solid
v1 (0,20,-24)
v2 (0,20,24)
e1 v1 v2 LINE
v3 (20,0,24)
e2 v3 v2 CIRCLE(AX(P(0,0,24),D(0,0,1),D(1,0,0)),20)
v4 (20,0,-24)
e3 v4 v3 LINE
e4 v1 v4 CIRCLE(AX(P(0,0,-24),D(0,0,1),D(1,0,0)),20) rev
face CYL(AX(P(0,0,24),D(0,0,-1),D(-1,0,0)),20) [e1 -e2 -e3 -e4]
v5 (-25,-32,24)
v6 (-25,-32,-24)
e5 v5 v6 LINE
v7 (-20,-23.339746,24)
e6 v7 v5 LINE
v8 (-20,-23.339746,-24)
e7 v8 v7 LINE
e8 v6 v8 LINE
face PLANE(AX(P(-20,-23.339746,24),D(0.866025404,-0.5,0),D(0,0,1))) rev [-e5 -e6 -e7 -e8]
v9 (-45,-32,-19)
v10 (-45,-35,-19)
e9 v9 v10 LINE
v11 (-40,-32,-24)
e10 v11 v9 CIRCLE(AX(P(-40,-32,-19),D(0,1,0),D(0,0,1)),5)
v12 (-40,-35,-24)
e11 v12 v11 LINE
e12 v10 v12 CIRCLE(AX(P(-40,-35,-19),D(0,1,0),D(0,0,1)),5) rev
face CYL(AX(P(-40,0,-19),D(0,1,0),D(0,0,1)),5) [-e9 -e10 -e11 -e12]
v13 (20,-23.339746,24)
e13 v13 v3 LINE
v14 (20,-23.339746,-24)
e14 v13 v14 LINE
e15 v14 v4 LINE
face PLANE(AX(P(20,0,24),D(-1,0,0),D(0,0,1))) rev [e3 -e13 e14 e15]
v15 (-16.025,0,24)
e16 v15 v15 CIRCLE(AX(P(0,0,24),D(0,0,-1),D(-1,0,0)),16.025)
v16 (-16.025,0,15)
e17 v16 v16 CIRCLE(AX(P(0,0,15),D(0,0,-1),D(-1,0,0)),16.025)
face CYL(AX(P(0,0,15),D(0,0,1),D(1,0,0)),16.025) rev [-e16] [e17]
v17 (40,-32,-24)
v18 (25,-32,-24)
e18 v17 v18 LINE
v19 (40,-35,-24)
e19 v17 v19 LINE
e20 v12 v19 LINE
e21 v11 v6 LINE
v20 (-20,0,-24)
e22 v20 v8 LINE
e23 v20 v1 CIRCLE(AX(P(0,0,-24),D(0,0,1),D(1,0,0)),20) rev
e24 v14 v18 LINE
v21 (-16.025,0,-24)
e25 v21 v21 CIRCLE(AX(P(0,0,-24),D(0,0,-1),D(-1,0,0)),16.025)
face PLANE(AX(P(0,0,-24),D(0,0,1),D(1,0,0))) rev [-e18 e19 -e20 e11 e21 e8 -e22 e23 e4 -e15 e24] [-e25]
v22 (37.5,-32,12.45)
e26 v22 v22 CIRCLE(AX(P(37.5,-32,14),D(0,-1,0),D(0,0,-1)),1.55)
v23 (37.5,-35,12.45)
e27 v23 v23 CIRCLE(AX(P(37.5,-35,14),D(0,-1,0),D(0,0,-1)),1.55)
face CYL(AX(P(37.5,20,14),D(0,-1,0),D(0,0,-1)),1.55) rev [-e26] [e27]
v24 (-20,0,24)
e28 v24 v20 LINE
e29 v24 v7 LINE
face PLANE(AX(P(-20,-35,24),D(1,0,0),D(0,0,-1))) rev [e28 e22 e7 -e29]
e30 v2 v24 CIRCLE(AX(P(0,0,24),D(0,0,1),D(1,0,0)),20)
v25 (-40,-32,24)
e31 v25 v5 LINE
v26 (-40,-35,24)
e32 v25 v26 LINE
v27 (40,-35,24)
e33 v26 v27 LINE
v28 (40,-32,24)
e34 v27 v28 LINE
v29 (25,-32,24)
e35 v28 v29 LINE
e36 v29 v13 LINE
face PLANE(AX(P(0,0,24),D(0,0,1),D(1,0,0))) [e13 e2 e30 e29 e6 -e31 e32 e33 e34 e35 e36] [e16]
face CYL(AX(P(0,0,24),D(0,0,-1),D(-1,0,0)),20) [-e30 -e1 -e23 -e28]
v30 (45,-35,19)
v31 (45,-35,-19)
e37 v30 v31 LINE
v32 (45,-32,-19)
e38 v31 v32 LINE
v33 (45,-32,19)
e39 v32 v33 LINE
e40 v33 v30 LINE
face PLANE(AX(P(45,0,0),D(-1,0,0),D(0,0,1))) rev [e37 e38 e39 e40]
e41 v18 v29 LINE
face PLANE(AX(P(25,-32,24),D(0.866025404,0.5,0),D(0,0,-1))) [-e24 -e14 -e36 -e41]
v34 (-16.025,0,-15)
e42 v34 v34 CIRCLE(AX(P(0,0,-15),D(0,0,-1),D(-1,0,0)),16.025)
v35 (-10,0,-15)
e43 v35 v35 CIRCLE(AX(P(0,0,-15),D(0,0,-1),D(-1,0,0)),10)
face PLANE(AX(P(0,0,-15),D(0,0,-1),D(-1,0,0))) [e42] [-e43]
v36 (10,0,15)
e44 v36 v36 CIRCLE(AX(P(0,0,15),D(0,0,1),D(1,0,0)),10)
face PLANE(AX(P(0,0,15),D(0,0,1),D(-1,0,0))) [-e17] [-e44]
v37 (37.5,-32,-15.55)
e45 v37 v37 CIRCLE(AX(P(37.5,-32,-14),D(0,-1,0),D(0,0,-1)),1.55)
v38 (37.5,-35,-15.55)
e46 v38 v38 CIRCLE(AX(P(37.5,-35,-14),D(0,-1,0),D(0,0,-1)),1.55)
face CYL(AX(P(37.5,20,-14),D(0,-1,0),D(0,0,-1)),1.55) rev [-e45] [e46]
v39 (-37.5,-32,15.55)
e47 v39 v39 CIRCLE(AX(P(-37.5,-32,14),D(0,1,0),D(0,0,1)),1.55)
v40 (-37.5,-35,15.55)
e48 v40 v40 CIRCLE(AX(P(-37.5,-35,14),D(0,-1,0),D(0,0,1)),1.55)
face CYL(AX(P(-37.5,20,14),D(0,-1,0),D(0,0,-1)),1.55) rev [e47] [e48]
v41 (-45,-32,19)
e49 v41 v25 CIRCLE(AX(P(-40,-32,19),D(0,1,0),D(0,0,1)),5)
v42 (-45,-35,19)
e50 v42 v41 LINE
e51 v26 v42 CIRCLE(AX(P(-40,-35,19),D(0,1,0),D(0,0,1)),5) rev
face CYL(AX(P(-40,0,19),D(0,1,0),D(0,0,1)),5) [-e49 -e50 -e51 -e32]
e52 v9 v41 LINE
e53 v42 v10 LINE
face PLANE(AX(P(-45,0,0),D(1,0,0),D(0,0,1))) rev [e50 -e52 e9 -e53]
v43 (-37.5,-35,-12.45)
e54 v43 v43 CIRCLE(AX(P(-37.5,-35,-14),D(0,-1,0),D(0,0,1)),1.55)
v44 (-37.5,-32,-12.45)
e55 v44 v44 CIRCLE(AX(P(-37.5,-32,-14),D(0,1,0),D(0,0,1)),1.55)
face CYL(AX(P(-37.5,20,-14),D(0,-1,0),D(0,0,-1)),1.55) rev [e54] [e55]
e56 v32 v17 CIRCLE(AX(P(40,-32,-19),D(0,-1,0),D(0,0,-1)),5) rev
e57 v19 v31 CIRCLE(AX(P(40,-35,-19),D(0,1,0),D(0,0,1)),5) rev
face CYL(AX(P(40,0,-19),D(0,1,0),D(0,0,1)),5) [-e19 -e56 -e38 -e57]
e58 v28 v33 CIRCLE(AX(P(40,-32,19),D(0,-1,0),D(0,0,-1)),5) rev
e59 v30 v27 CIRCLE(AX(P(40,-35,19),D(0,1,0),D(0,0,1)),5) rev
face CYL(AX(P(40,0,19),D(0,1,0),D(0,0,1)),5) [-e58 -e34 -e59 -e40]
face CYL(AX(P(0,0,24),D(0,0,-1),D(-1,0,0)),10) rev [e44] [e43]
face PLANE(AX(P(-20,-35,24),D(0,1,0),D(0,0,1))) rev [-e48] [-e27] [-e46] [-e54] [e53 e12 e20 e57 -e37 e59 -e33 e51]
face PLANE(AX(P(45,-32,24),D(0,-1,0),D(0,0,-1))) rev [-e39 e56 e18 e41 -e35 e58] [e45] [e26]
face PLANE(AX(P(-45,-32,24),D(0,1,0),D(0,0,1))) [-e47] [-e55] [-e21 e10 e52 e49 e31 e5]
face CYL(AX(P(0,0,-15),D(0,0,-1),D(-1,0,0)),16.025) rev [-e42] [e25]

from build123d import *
from OCP.BRepFilletAPI import BRepFilletAPI_MakeChamfer

# Parameters (mm, degrees)
SKETCH_1_R          = 10
EXTRUDE_1_DEPTH     = 24
SKETCH_4_R          = 16.025
CUT_EXTRUDE_3_DEPTH = 9
SKETCH_5_W          = 48
SKETCH_5_H          = 3
EXTRUDE_2_DEPTH     = 25
CHAMFER_1_SIZE      = 5
CHAMFER_1_SIZE2     = 8.660254038
SKETCH_7_R          = 1.55
CUT_EXTRUDE_4_DEPTH = 76.00666637
FILLET_1_R          = 20
FILLET_2_R          = 5


with BuildPart() as part:
    # 草图1 → 凸台-拉伸1 (new, symmetric)
    with BuildSketch(Plane.XY):
        Polygon((-20, -35), (-20, 0), (-20, 20), (20, 20), (20, 0), (20, -35), align=None)
        Circle(SKETCH_1_R, mode=Mode.SUBTRACT)
    extrude(amount=EXTRUDE_1_DEPTH, both=True)

    # 草图4 → 切除-拉伸3 (cut)
    with BuildSketch(Plane(origin=(0, 0, -24), x_dir=(-1, 0, 0), z_dir=(0, 0, -1))):
        Circle(SKETCH_4_R)
    cut_extrude_3 = extrude(amount=-CUT_EXTRUDE_3_DEPTH, mode=Mode.SUBTRACT)

    # 镜向1: 切除-拉伸3 across plane
    add(cut_extrude_3.mirror(Plane.XY), mode=Mode.SUBTRACT)

    # 草图5 → 凸台-拉伸2 (add)
    with BuildSketch(Plane(origin=(20, 0, 0), x_dir=(0, 0, -1), z_dir=(1, 0, 0))):
        with Locations((0, -33.5)):
            Rectangle(SKETCH_5_W, SKETCH_5_H)
    extrude_2 = extrude(amount=EXTRUDE_2_DEPTH)

    # 镜向2: 凸台-拉伸2 across plane
    add(extrude_2.mirror(Plane.ZY))

    # 倒角1: one chamfer whose edges measure the first distance from different faces: ONE call of the kernel's chamfer builder (chamfer() names one face for all edges)
    chamfer_1_edges_1 = [part.edges().sort_by_distance(p)[0] for p in [
        (20, -32, 0),
    ]]
    chamfer_1_side_1 = [part.faces().sort_by_distance(p)[0] for p in [
        (32.5, -32, 0),
    ]]
    chamfer_1_edges_2 = [part.edges().sort_by_distance(p)[0] for p in [
        (-20, -32, 0),
    ]]
    chamfer_1_side_2 = [part.faces().sort_by_distance(p)[0] for p in [
        (-32.5, -32, 0),
    ]]
    chamfer_1 = BRepFilletAPI_MakeChamfer(part.part.solid().wrapped)
    for e in chamfer_1_edges_1:
        chamfer_1.Add(CHAMFER_1_SIZE, CHAMFER_1_SIZE2, e.wrapped, chamfer_1_side_1[0].wrapped)  # the first distance lies on this face
    for e in chamfer_1_edges_2:
        chamfer_1.Add(CHAMFER_1_SIZE, CHAMFER_1_SIZE2, e.wrapped, chamfer_1_side_2[0].wrapped)  # the first distance lies on this face
    add(Compound.cast(chamfer_1.Shape()), mode=Mode.REPLACE)

    # 草图7 → 切除-拉伸4 (cut, through all)
    with BuildSketch(Plane.XZ.offset(35)):
        with Locations(Location((37.5, 14, 0), (0, 0, 270))):
            Circle(SKETCH_7_R)
        with Locations(Location((37.5, -14, 0), (0, 0, 270))):
            Circle(SKETCH_7_R)
        with Locations(Location((-37.5, 14, 0), (0, 0, 90))):
            Circle(SKETCH_7_R)
        with Locations(Location((-37.5, -14, 0), (0, 0, 90))):
            Circle(SKETCH_7_R)
    extrude(amount=-CUT_EXTRUDE_4_DEPTH, mode=Mode.SUBTRACT)

    # 圆角1
    fillet_1_edges = [part.edges().sort_by_distance(p)[0] for p in [
        (20, 20, 0),
        (-20, 20, 0),
    ]]
    fillet(fillet_1_edges, radius=FILLET_1_R - 0.0001)  # a hair under: the kernel refuses the full size

    # 圆角2
    fillet_2_edges = [part.edges().sort_by_distance(p)[0] for p in [
        (45, -33.5, 24),
        (45, -33.5, -24),
        (-45, -33.5, 24),
        (-45, -33.5, -24),
    ]]
    fillet(fillet_2_edges, radius=FILLET_2_R)


solid = part.part
